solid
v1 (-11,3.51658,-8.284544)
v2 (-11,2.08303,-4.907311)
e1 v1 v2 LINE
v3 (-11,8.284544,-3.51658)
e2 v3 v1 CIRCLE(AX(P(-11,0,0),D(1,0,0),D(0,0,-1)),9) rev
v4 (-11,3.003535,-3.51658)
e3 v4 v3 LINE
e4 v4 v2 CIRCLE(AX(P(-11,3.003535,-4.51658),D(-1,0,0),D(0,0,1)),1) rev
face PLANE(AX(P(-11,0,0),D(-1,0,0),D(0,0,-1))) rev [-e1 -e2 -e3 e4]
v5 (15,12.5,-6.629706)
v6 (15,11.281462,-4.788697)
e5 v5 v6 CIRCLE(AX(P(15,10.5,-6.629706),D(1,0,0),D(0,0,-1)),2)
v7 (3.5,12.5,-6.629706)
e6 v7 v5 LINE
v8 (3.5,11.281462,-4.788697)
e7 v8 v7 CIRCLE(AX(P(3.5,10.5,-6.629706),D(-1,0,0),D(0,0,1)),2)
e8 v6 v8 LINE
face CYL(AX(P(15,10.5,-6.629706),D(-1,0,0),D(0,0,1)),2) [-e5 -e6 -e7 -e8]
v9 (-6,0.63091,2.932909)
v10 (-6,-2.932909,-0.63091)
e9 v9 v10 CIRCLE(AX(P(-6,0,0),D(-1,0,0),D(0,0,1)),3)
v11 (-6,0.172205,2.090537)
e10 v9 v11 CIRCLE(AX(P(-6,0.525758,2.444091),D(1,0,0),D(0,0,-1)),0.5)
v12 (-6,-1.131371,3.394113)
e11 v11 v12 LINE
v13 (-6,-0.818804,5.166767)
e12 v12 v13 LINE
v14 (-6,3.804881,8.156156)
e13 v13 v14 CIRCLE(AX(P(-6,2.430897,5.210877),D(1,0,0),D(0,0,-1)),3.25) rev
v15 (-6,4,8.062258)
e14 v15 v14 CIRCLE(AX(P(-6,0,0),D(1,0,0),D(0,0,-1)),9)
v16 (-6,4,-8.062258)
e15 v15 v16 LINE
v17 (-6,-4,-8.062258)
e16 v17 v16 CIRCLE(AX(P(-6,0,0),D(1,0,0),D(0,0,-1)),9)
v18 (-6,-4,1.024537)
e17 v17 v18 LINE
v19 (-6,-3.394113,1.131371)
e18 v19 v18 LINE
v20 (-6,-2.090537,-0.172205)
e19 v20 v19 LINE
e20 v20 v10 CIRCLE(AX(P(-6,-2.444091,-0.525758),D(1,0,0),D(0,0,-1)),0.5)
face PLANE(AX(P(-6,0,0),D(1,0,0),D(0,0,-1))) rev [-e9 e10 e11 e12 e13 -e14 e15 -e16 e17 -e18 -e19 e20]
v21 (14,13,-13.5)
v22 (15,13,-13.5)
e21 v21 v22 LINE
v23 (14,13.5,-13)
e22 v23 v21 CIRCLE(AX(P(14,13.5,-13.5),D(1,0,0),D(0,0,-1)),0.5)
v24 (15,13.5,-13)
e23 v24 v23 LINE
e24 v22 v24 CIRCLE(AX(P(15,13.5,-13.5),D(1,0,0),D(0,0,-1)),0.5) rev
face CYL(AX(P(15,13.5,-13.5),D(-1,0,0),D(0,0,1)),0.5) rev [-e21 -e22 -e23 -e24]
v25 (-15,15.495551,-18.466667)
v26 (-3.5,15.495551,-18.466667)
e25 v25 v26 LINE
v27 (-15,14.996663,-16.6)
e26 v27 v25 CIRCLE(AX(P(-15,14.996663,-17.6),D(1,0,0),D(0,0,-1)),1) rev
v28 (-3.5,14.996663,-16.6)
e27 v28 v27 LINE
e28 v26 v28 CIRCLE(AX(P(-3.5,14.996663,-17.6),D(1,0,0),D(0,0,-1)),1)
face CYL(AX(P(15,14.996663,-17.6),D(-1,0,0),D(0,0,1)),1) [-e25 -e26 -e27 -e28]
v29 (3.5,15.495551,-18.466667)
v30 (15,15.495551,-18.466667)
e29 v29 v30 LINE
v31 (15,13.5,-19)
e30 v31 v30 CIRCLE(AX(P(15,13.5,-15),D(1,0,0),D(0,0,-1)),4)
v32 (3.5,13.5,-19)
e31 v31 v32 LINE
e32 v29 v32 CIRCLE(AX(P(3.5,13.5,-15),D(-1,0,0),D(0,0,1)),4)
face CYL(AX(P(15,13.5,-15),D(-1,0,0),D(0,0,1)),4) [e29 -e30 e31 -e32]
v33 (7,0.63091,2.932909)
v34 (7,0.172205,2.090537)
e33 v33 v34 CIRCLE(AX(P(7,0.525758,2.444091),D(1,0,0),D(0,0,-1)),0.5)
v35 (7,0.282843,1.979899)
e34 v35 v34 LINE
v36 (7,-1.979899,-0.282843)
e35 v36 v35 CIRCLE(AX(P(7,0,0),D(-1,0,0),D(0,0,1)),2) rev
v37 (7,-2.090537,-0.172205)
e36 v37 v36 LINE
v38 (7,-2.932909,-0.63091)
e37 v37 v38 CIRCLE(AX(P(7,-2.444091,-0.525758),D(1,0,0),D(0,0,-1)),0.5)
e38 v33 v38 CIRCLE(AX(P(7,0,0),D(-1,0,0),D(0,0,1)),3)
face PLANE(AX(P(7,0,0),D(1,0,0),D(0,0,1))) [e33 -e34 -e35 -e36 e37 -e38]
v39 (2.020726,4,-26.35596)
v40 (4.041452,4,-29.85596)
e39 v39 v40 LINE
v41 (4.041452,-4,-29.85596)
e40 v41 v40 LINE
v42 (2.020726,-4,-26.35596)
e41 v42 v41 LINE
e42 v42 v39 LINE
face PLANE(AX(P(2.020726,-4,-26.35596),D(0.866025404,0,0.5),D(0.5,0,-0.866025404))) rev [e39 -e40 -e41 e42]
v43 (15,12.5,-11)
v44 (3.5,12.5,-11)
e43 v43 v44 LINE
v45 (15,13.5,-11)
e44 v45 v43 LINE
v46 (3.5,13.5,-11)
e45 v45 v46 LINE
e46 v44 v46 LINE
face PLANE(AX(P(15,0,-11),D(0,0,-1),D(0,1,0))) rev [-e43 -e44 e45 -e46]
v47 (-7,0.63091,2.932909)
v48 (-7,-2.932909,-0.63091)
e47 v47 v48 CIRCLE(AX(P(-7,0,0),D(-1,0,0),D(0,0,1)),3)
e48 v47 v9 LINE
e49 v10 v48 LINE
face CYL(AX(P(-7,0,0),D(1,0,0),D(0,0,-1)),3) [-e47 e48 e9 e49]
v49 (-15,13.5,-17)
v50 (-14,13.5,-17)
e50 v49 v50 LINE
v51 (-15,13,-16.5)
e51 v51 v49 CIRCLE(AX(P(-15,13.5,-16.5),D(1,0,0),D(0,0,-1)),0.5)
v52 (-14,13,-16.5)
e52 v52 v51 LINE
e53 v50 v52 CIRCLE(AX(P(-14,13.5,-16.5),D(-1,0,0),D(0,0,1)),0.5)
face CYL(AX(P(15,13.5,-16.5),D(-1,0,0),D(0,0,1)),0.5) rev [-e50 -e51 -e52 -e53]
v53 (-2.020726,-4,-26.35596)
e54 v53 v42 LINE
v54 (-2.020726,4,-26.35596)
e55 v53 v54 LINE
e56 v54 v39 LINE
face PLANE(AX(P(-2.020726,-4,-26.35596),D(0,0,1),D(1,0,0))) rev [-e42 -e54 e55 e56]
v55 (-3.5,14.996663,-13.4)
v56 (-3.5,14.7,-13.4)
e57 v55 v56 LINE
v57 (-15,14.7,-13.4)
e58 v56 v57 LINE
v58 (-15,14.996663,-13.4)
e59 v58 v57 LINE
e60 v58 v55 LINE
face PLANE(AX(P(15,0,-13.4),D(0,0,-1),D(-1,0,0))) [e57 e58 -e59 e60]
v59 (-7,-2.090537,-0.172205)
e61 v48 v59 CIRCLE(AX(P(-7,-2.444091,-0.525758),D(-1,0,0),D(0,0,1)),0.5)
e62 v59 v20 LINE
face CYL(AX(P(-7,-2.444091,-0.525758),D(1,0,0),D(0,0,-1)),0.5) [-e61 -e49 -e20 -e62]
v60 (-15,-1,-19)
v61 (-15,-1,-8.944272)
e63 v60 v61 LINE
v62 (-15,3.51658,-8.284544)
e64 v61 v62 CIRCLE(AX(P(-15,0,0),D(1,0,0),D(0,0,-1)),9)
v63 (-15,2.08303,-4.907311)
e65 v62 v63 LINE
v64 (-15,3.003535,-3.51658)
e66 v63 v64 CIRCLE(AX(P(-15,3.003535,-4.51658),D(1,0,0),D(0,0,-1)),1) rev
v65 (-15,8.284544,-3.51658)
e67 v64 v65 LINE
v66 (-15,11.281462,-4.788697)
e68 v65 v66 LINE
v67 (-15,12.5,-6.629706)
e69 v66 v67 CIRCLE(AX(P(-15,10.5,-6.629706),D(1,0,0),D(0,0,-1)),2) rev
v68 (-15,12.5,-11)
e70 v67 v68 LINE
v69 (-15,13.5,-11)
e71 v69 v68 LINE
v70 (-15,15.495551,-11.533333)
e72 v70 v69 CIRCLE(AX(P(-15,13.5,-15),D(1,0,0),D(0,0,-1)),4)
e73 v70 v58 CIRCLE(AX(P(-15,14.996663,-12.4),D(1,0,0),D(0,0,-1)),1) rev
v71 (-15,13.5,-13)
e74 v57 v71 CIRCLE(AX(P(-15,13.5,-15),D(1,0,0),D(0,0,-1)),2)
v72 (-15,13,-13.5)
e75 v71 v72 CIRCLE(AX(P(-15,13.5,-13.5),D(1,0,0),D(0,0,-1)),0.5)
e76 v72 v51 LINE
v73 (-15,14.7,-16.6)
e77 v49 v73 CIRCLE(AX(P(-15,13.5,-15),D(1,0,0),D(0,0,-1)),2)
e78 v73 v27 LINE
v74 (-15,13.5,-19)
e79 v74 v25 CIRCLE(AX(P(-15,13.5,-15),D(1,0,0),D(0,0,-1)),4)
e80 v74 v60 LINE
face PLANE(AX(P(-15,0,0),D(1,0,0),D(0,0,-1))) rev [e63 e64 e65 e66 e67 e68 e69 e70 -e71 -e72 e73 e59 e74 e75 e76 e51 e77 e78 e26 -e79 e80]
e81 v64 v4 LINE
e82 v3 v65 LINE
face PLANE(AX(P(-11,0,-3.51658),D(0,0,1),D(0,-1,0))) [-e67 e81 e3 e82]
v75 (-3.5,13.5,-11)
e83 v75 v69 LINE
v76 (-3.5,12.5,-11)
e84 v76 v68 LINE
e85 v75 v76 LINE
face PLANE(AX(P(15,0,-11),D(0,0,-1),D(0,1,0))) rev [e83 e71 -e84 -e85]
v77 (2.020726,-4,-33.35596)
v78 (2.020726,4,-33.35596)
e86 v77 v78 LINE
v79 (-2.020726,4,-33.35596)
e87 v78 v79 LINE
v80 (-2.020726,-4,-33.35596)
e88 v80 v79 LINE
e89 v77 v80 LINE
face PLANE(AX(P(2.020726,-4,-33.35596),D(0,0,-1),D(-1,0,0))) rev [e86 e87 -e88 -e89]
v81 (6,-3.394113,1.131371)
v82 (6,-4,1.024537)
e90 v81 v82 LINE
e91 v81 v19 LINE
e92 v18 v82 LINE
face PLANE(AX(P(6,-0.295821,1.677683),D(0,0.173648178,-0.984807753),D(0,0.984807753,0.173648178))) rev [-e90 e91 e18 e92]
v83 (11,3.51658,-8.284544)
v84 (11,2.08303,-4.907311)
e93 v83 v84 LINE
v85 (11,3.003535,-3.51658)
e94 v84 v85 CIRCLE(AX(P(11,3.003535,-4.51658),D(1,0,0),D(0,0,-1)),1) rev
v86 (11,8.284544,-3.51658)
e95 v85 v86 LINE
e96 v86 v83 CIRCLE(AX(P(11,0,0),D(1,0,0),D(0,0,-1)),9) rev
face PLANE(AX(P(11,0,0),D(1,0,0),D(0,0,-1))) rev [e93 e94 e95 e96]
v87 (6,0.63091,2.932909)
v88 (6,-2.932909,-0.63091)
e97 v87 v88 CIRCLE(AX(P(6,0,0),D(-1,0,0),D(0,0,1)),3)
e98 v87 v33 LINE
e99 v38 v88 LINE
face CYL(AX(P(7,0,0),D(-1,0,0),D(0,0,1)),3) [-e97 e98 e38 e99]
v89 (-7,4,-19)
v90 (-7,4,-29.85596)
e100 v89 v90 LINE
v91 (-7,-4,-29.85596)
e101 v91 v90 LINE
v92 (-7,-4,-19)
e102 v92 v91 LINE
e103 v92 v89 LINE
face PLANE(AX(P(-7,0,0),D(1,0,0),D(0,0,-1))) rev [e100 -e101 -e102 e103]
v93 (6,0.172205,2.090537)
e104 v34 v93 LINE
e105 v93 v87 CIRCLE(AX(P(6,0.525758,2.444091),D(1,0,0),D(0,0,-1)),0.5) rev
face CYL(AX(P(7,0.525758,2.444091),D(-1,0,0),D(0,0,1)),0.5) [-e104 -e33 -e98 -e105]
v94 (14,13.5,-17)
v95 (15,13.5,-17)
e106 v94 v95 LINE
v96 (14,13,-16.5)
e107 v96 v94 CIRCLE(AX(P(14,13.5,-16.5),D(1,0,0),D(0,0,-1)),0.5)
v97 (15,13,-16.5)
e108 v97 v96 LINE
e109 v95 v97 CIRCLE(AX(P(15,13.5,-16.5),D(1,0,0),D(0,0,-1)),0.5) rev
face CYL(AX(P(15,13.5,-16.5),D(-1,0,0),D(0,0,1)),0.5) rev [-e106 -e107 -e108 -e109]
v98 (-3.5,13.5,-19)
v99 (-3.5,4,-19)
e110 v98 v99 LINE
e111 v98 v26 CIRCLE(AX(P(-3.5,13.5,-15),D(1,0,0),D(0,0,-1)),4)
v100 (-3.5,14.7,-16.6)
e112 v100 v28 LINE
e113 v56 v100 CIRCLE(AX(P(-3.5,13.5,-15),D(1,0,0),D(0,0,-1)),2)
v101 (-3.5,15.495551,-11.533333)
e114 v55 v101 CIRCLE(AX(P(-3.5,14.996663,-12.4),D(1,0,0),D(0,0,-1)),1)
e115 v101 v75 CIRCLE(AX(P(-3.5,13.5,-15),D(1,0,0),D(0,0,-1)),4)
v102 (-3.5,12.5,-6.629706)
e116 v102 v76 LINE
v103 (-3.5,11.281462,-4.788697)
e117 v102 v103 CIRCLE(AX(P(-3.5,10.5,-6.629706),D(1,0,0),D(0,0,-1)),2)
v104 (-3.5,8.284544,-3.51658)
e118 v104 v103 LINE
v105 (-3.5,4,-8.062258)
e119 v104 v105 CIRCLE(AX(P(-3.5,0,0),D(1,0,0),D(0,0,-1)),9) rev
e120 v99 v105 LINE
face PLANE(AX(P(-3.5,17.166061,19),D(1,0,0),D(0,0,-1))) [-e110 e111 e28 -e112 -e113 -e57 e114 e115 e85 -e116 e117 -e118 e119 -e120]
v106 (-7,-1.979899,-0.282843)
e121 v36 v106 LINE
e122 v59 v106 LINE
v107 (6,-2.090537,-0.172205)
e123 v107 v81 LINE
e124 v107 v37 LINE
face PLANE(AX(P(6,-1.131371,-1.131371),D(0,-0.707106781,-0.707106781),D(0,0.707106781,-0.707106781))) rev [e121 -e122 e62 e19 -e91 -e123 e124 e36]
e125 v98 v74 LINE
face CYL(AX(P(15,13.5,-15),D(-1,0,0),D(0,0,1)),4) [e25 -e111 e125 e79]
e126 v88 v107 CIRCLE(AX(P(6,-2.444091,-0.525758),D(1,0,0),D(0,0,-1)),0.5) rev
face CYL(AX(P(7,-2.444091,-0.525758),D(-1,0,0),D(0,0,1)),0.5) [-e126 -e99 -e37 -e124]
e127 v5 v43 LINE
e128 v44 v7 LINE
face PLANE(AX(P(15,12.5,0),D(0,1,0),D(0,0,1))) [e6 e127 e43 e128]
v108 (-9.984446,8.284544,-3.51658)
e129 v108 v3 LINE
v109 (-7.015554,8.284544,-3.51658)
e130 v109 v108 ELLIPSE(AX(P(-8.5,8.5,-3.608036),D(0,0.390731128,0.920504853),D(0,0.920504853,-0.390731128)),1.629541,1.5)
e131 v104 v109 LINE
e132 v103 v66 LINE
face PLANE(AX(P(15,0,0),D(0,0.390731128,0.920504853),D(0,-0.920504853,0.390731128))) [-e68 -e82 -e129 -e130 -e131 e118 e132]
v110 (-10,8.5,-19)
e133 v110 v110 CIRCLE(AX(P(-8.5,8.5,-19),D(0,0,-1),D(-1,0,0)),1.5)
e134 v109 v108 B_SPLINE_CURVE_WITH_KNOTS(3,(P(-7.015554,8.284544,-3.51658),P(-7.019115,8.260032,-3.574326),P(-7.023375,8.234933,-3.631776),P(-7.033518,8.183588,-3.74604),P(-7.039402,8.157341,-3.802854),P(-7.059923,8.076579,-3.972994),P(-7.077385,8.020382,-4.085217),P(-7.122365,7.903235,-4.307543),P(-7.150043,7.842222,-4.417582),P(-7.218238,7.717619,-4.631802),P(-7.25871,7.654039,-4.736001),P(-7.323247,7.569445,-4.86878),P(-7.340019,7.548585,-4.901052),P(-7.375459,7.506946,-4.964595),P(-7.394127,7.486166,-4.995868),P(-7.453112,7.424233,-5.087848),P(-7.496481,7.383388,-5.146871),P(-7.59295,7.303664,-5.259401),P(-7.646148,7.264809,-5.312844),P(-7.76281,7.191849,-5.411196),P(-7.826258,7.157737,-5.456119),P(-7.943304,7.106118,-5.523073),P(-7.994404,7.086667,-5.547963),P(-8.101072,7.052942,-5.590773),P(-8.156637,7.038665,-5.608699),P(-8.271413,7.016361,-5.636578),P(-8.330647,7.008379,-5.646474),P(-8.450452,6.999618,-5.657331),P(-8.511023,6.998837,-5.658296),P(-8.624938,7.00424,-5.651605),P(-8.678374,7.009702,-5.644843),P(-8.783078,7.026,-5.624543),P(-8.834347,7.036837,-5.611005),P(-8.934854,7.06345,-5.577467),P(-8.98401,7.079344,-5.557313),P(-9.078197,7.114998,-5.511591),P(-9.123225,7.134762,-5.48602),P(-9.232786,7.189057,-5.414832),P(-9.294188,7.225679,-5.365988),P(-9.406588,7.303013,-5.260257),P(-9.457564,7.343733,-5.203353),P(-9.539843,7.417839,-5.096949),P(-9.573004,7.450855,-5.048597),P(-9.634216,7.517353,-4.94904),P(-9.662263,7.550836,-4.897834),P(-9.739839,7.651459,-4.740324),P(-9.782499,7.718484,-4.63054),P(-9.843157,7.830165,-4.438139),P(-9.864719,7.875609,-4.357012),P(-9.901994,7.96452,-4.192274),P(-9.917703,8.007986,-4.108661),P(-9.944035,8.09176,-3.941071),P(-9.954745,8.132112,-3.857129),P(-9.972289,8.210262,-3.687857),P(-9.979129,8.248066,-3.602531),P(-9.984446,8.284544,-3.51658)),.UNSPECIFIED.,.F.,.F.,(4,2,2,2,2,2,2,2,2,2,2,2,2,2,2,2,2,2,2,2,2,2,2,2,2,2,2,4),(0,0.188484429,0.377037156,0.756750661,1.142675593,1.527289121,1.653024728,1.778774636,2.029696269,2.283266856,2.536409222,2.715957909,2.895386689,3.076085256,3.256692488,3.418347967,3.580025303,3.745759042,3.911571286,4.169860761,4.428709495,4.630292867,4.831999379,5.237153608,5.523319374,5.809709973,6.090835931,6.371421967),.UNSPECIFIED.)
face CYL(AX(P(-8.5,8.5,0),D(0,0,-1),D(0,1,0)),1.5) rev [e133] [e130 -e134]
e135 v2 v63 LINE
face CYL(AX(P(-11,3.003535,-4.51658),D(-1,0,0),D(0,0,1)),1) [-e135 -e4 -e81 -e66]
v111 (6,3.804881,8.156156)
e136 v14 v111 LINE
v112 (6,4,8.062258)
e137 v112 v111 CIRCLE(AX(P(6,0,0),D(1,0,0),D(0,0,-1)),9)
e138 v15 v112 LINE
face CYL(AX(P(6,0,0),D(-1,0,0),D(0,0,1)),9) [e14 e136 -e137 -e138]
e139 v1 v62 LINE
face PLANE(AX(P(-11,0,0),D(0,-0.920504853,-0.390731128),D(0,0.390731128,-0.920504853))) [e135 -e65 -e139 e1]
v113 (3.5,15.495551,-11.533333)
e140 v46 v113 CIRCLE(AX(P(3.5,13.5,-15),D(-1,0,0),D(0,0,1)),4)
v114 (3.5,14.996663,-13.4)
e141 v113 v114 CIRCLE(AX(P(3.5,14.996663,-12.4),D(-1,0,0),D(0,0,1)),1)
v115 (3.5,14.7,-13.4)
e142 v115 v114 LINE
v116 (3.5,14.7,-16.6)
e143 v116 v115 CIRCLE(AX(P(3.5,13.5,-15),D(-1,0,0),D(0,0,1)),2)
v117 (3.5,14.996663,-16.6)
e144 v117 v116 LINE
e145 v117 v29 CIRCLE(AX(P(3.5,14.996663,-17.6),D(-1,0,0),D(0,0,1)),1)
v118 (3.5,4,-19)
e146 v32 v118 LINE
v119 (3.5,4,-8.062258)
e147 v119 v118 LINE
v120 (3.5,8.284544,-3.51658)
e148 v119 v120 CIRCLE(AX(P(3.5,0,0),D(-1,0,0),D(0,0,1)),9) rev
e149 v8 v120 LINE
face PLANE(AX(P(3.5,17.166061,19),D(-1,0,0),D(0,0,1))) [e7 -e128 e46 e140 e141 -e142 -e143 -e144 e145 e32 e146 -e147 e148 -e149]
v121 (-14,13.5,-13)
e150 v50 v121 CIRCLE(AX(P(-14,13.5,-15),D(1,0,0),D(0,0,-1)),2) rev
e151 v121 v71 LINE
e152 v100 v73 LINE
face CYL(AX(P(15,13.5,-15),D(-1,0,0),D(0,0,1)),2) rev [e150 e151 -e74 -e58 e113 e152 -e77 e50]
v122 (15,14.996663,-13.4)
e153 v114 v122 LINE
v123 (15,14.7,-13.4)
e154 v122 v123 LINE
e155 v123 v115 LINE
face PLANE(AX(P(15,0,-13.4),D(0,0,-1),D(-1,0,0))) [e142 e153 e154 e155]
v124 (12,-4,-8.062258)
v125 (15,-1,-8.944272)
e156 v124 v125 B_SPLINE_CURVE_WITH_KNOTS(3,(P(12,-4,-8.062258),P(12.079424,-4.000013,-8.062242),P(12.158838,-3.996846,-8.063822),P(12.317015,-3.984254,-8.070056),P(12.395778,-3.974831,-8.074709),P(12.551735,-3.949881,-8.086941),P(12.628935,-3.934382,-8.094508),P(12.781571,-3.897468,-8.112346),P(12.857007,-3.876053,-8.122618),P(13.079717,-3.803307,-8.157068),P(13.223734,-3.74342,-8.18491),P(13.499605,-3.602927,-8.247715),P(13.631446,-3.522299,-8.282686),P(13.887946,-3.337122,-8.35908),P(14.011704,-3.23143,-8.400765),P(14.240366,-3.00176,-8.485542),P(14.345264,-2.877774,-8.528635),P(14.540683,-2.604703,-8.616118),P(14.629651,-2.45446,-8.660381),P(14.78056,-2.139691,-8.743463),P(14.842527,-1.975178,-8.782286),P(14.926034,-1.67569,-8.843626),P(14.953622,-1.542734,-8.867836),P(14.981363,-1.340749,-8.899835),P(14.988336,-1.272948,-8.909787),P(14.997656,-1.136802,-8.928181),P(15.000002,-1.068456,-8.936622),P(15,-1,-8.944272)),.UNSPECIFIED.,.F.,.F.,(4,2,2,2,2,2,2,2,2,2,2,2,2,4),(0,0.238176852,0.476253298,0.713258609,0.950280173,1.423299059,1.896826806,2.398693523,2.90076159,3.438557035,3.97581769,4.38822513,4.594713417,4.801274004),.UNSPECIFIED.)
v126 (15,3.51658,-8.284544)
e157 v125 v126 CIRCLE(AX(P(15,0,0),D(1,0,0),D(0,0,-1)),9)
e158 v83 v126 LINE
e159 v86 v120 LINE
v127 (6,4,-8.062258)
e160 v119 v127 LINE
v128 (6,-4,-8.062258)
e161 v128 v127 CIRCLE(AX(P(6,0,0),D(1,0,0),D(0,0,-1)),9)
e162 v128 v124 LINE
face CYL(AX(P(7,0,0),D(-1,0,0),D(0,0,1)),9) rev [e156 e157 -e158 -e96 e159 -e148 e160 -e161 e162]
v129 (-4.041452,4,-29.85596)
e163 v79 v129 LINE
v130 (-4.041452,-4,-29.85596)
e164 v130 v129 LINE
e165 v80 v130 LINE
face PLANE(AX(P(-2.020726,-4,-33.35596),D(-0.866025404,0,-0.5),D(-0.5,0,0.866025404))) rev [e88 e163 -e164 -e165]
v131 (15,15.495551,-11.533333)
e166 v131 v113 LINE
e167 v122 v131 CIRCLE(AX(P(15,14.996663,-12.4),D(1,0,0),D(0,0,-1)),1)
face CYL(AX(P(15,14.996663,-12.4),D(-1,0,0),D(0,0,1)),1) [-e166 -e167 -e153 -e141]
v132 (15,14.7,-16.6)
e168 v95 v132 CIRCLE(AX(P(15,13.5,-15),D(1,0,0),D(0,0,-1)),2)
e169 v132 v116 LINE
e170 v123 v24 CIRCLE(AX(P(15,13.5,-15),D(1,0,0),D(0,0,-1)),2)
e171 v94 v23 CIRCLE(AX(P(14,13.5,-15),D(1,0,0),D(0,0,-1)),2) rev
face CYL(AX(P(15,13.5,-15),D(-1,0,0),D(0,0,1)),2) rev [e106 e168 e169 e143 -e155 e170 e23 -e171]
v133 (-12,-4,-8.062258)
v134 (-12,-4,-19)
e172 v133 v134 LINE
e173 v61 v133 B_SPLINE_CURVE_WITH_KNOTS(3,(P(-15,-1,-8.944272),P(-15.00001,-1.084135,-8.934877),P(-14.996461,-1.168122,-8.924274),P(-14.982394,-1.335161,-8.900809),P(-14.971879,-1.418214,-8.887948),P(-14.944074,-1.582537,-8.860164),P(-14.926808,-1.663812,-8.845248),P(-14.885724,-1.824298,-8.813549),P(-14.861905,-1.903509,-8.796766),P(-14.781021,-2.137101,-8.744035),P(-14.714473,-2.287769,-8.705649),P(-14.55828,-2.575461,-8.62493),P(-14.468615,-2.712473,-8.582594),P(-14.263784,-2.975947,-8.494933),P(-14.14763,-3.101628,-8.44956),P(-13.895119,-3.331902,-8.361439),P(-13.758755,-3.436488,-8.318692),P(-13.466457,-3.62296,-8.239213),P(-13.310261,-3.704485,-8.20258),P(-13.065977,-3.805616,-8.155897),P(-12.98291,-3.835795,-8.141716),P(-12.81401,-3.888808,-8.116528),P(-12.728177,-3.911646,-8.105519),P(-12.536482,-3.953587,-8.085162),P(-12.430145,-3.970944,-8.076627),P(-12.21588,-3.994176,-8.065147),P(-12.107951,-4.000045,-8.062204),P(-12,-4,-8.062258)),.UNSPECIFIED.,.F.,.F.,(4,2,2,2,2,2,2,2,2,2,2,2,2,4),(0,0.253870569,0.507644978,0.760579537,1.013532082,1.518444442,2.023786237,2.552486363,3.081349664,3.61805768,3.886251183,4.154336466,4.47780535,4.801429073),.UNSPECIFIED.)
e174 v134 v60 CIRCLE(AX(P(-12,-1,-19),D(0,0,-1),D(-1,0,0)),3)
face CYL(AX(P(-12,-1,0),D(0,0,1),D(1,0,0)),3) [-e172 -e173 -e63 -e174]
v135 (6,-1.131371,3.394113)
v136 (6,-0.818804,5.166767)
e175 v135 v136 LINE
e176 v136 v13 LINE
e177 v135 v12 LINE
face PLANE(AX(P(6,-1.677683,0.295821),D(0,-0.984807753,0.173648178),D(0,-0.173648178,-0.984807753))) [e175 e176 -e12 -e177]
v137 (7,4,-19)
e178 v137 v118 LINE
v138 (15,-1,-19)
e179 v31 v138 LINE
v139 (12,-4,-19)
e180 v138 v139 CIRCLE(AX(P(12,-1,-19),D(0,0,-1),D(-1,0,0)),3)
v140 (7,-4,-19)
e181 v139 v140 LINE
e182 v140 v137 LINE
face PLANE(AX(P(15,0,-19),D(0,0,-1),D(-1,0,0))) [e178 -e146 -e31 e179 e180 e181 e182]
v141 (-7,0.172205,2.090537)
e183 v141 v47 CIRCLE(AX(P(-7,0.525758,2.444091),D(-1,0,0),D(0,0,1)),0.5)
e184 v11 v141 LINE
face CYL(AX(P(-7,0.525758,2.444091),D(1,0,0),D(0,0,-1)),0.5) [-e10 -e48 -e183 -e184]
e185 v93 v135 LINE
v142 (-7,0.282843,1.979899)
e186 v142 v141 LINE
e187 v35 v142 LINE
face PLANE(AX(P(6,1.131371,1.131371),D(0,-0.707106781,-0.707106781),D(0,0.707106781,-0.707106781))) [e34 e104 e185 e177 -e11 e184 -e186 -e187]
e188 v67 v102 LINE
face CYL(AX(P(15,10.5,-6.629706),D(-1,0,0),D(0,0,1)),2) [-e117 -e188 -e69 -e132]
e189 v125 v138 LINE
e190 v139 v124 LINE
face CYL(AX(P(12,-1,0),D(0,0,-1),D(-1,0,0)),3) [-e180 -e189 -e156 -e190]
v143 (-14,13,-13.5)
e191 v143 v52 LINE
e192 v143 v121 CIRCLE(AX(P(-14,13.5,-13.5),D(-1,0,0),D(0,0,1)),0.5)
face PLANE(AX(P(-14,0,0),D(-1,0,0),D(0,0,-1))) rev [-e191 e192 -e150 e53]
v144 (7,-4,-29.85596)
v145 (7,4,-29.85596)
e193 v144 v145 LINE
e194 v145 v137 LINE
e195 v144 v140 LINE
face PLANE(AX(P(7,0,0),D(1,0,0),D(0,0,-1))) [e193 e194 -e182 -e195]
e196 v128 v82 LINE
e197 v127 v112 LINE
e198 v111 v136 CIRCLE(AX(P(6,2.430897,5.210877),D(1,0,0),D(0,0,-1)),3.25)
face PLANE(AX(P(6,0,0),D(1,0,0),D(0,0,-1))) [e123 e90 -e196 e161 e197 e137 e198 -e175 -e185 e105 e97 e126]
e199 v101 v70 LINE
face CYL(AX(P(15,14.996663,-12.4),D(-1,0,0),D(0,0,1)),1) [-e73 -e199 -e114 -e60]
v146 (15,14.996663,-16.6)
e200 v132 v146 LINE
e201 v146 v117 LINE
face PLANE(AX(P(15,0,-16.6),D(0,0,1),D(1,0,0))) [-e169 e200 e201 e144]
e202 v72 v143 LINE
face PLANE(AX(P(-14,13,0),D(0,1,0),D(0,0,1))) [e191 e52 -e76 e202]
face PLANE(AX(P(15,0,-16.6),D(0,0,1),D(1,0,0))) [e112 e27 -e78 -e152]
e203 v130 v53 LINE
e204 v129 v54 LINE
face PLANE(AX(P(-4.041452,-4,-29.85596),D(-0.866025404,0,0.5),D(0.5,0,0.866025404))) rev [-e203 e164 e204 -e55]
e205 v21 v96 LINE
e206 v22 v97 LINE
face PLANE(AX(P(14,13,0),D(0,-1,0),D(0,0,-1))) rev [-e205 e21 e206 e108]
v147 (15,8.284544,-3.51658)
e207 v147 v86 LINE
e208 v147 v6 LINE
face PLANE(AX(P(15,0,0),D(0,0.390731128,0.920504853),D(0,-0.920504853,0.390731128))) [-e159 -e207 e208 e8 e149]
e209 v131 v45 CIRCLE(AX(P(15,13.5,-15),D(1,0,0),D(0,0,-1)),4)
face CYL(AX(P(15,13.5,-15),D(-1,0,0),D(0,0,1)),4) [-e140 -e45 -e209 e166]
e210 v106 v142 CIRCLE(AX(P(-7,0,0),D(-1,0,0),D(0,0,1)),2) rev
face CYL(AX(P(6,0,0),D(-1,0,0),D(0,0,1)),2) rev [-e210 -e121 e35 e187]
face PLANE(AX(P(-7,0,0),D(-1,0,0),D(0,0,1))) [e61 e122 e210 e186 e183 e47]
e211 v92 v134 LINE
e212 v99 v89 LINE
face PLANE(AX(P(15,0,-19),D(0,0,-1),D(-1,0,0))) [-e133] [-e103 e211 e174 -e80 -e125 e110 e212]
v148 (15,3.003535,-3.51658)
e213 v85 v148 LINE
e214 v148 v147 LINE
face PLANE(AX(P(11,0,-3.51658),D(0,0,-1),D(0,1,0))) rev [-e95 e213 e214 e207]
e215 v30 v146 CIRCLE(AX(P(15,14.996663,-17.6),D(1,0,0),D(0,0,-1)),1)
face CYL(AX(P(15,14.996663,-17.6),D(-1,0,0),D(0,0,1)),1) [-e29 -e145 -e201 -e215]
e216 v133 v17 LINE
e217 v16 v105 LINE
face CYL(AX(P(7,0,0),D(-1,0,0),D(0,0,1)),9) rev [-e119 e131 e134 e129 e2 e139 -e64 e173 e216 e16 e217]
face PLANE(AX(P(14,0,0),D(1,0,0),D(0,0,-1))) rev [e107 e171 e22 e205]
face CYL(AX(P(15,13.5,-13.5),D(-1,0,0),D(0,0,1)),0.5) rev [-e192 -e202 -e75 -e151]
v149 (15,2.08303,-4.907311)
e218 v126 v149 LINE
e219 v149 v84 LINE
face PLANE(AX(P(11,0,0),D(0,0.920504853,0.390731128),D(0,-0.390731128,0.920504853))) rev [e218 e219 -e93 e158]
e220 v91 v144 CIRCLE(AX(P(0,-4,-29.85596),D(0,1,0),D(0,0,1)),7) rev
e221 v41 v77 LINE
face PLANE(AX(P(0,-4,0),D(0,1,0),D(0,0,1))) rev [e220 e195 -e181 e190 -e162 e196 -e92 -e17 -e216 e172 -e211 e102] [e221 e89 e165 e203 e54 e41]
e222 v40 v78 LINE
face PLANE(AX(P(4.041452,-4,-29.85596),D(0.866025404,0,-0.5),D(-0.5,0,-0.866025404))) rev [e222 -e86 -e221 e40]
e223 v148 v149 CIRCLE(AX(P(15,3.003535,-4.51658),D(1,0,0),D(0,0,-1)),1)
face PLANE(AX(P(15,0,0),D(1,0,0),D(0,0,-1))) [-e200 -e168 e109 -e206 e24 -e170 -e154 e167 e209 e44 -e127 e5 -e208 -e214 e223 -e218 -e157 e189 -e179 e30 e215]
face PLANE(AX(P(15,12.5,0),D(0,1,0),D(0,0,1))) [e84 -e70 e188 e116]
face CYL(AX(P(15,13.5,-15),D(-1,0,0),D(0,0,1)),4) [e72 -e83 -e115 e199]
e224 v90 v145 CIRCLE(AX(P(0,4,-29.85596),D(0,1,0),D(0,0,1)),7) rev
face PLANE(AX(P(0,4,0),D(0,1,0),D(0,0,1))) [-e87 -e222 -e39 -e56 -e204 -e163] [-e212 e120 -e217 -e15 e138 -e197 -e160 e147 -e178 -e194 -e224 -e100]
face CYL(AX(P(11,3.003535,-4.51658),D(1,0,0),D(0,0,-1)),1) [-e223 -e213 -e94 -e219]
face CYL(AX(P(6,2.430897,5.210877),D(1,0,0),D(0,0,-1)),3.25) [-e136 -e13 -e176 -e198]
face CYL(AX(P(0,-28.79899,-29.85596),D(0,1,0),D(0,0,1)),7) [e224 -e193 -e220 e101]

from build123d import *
from build123d.topology import SkipClean

# Parameters (mm, degrees)
BOSS_EXTRUDE1_DEPTH      = 6
BOSS_EXTRUDE2_DEPTH      = 7
SKETCH6_R                = 7
BOSS_EXTRUDE3_DEPTH      = 18
BOSS_EXTRUDE4_DEPTH      = 8
BOSS_EXTRUDE4_DEPTH_BACK = 8
SKETCH7_R                = 4.5
CUT_EXTRUDE2_DEPTH       = 5
CUT_EXTRUDE4_START       = -5
CUT_EXTRUDE4_DEPTH       = 5
BOSS_EXTRUDE6_DEPTH      = 1
FILLET3_R                = 0.5
FILLET3_OF_MIRROR1_R     = 0.5
BOSS_EXTRUDE5_DEPTH      = 15
SKETCH20_W               = 7
SKETCH20_H               = 38
CUT_EXTRUDE7_DEPTH       = 42.913087917
FILLET1_START            = -6
FILLET1_DEPTH            = 12
FILLET2_R                = 1
CUT_EXTRUDE8_DEPTH       = 42.560578801
BOSS_EXTRUDE7_DEPTH      = 1
FILLET4_R                = 0.5
FILLET4_OF_MIRROR2_R     = 0.5
FILLET5_R                = 3
FILLET7_R                = 2
CUT_SWEEP1_PROFILE_R     = 1.5
BOSS_EXTRUDE8_DEPTH      = 4
FILLET8_R                = 1
FILLET8_OF_MIRROR3_R     = 1


with BuildPart() as part:
    # Sketch3 → Boss-Extrude1 (new, symmetric)
    with BuildSketch(Plane(origin=(0, 0, 0), x_dir=(0, 0, -1), z_dir=(1, 0, 0))):
        with BuildLine():
            ThreePointArc((2, 0), (1.51090791, -1.310403483), (0.282842712, -1.979898987))
            Line((0.282842712, -1.979898987), (-1.13137085, -3.39411255))
            Line((-1.13137085, -3.39411255), (-0.81880413, -5.166766505))
            Line((-0.81880413, -5.166766505), (-3.807139593, -8.155101968))
            ThreePointArc((-3.807139593, -8.155101968), (4.834032667, -7.591582718), (9, 0))
            ThreePointArc((9, 0), (-1.949882341, 8.7862369), (-8.155101968, -3.807139593))
            Line((-8.155101968, -3.807139593), (-5.166766505, -0.81880413))
            Line((-5.166766505, -0.81880413), (-3.39411255, -1.13137085))
            Line((-3.39411255, -1.13137085), (-1.979898987, 0.282842712))
            ThreePointArc((-1.979898987, 0.282842712), (0.14177804, 1.994968418), (2, 0))
        make_face()
    extrude(amount=BOSS_EXTRUDE1_DEPTH, both=True)

    # Sketch5 → Boss-Extrude2 (add, symmetric)
    with BuildSketch(Plane(origin=(0, 0, 0), x_dir=(0, 0, -1), z_dir=(1, 0, 0))):
        with BuildLine():
            Line((0, 9), (29.855960009, 9))
            Line((29.855960009, 9), (29.855960009, -9))
            Line((29.855960009, -9), (0, -9))
            ThreePointArc((0, -9), (9, 0), (0, 9))
        make_face()
    extrude(amount=BOSS_EXTRUDE2_DEPTH, both=True)

    # Sketch6 → Boss-Extrude3 (add)
    with BuildSketch(Plane(origin=(0, 9, 0), x_dir=(1, 0, 0), z_dir=(0, 1, 0))):
        with Locations((0, 29.855960009)):
            Circle(SKETCH6_R)
    extrude(amount=-BOSS_EXTRUDE3_DEPTH)

    # Sketch7 → Boss-Extrude4 (add, two sides: drawn at the far end of the back side and taken through both)
    with BuildSketch(Plane(origin=(0, 0, 0), x_dir=(1, 0, 0), z_dir=(0, 1, 0)).offset(-BOSS_EXTRUDE4_DEPTH_BACK)):
        with Locations((0, 29.855960009)):
            Circle(SKETCH7_R)
    extrude(amount=BOSS_EXTRUDE4_DEPTH + BOSS_EXTRUDE4_DEPTH_BACK)

    # Sketch8 → Cut-Extrude2 (cut)
    with BuildSketch(Plane(origin=(0, 9, 0), x_dir=(1, 0, 0), z_dir=(0, 1, 0))):
        with BuildLine():
            Line((6, -9), (6, 0))
            Line((6, 0), (7, 0))
            Line((7, 0), (7, 29.855960009))
            ThreePointArc((7, 29.855960009), (0, 36.855960009), (-7, 29.855960009))
            Line((-7, 29.855960009), (-7, 0))
            Line((-7, 0), (-6, 0))
            Line((-6, 0), (-6, -9))
            Line((-6, -9), (6, -9))
        make_face()
    extrude(amount=-CUT_EXTRUDE2_DEPTH, mode=Mode.SUBTRACT)

    # Sketch9 → Cut-Extrude4 (cut)
    with BuildSketch(Plane.XZ.offset(9).offset(CUT_EXTRUDE4_START)):
        with BuildLine():
            Line((6, 0), (6, 9))
            Line((6, 9), (-6, 9))
            Line((-6, 9), (-6, 0))
            Line((-6, 0), (-7, 0))
            Line((-7, 0), (-7, -29.855960009))
            ThreePointArc((-7, -29.855960009), (0, -36.855960009), (7, -29.855960009))
            Line((7, -29.855960009), (7, 0))
            Line((7, 0), (6, 0))
        make_face()
    extrude(amount=CUT_EXTRUDE4_DEPTH, mode=Mode.SUBTRACT)

    # Sketch24 → Boss-Extrude6 (add)
    with SkipClean():  # the faces are left unmerged after this step: merging them gives an invalid solid
        with BuildSketch(Plane.ZY.offset(6)):
            with BuildLine():
                ThreePointArc((-0.282842712, -1.979898987), (-1.414213562, 1.414213562), (1.979898987, 0.282842712))
                Line((1.979898987, 0.282842712), (2.925806694, -0.663064995))
                ThreePointArc((2.925806694, -0.663064995), (2.981393976, -0.333601496), (3, 0))
                ThreePointArc((3, 0), (-2.344055778, 1.872272018), (0.663064995, -2.925806694))
                Line((0.663064995, -2.925806694), (-0.282842712, -1.979898987))
            make_face()
        boss_extrude6 = extrude(amount=BOSS_EXTRUDE6_DEPTH)

    # Fillet3
    # the kernel refuses this fillet: 0.5 mm, written as the material it takes off along each edge
    with BuildSketch(Plane(origin=(-6, -0.663064995, 2.925806694), x_dir=(0, 0.9999849386062066, 0.005488402385122609), z_dir=(-1, 0, 0))) as fillet3_piece_1:
        with BuildLine():
            CenterArc((1.186161173, 0.488233633), FILLET3_R, 135.314463872, 147.140119621)
            Line((0.830672664, 0.839841255), (0, 0))
            ThreePointArc((0, 0), (0.646997003, -0.070598205), (1.293994007, 0))
        make_face()
    extrude(amount=4.234985017, mode=Mode.SUBTRACT)
    with BuildSketch(Plane(origin=(-6, -2.925806694, 0.663064995), x_dir=(0, -0.005488402385198552, -0.9999849386062063), z_dir=(-1, 0, 0))) as fillet3_piece_2:
        with BuildLine():
            CenterArc((1.186161173, -0.488233633), FILLET3_R, 77.545416507, 147.140119621)
            Line((0.830672664, -0.839841255), (0, 0))
            ThreePointArc((0, 0), (0.646997003, 0.070598205), (1.293994007, 0))
        make_face()
    extrude(amount=4.234985017, mode=Mode.SUBTRACT)

    # Mirror1: Boss-Extrude6 across plane
    add(boss_extrude6.mirror(Plane(origin=(0, 0, 0), x_dir=(0, 0, 1), z_dir=(1, 0, 0))))

    # Fillet3 of Mirror1
    # the kernel refuses this fillet: 0.5 mm, written as the material it takes off along each edge
    with BuildSketch(Plane(origin=(6, -0.663064995, 2.925806694), x_dir=(0, 0.7071067811865444, -0.7071067811865507), z_dir=(1, 0, 0))) as fillet3_of_mirror1_piece_1:
        with BuildLine():
            CenterArc((1.181249511, 0.5), FILLET3_OF_MIRROR1_R, 122.859880379, 147.140119621)
            ThreePointArc((0.909956312, 0.92), (0.404784455, 0.509645734), (0, 0))
            Line((0, 0), (1.181249511, 0))
        make_face()
    extrude(amount=4.234985017, mode=Mode.SUBTRACT)
    with BuildSketch(Plane(origin=(6, -2.925806694, 0.663064995), x_dir=(0, 0.7071067811865442, -0.7071067811865509), z_dir=(1, 0, 0))) as fillet3_of_mirror1_piece_2:
        with BuildLine():
            CenterArc((1.181249511, -0.5), FILLET3_OF_MIRROR1_R, 90, 147.140119621)
            ThreePointArc((0.909956312, -0.92), (0.404784455, -0.509645734), (0, 0))
            Line((0, 0), (1.181249511, 0))
        make_face()
    extrude(amount=4.234985017, mode=Mode.SUBTRACT)

    # Sketch10 → Boss-Extrude5 (add, symmetric)
    with BuildSketch(Plane(origin=(0, 0, 0), x_dir=(0, 0, -1), z_dir=(1, 0, 0))):
        with BuildLine():
            ThreePointArc((8.062257748, -4), (9, 0), (8.062257748, 4))
            Line((8.062257748, 4), (19, 4))
            Line((19, 4), (19, -4))
            Line((19, -4), (8.062257748, -4))
        make_face()
        with BuildLine():
            Line((13.4, 17.166060556), (13.4, 14.7))
            ThreePointArc((13.4, 14.7), (15, 11.5), (16.6, 14.7))
            Line((16.6, 14.7), (16.6, 17.166060556))
            ThreePointArc((16.6, 17.166060556), (18.346640106, 15.69089023), (19, 13.5))
            Line((19, 13.5), (19, 4))
            Line((19, 4), (8.062257748, 4))
            ThreePointArc((8.062257748, 4), (6.173062485, 6.549297638), (3.516580156, 8.284543681))
            Line((3.516580156, 8.284543681), (5.305935203, 12.5))
            Line((5.305935203, 12.5), (11, 12.5))
            Line((11, 12.5), (11, 13.5))
            ThreePointArc((11, 13.5), (11.653359894, 15.69089023), (13.4, 17.166060556))
        make_face()
    extrude(amount=BOSS_EXTRUDE5_DEPTH, both=True)

    # Sketch20 → Cut-Extrude7 (cut, through all)
    with BuildSketch(Plane(origin=(0, 4, 0), x_dir=(1, 0, 0), z_dir=(0, 1, 0))):
        Rectangle(SKETCH20_W, SKETCH20_H)
    extrude(amount=CUT_EXTRUDE7_DEPTH, mode=Mode.SUBTRACT)

    # Fillet1: read off the stored shape, not the designer's step
    # Fillet1 outline → Fillet1 (cut)
    with BuildSketch(Plane.YZ.offset(FILLET1_START)):
        with BuildLine():
            ThreePointArc((-0.81880413, 5.166766505), (0.666331593, 7.940128227), (3.804881491, 8.156155764))
            ThreePointArc((3.804881491, 8.156155764), (-0.001245944, 8.999999913), (-3.807139593, 8.155101968))
            Line((-3.807139593, 8.155101968), (-0.81880413, 5.166766505))
        make_face()
    extrude(amount=FILLET1_DEPTH, mode=Mode.SUBTRACT)

    # Fillet2
    fillet2_edges = [part.edges().sort_by_distance(p)[0] for p in [
        (9.25, 17.166060556, -16.6),
        (9.25, 17.166060556, -13.4),
        (-9.25, 17.166060556, -13.4),
        (-9.25, 17.166060556, -16.6),
    ]]
    fillet(fillet2_edges, radius=FILLET2_R)

    # Sketch23 → Cut-Extrude8 (cut, through all)
    with BuildSketch(Plane(origin=(0, 4, 0), x_dir=(1, 0, 0), z_dir=(0, 1, 0))):
        Polygon((4.041451884, 29.855960009), (2.020725942, 33.355960009), (-2.020725942, 33.355960009), (-4.041451884, 29.855960009), (-2.020725942, 26.355960009), (2.020725942, 26.355960009), align=None)
    extrude(amount=-CUT_EXTRUDE8_DEPTH, mode=Mode.SUBTRACT)

    # Sketch25 → Boss-Extrude7 (add)
    with BuildSketch(Plane(origin=(15, 0, 0), x_dir=(0, 0, -1), z_dir=(1, 0, 0))):
        with BuildLine():
            Line((16.936491673, 13), (13.063508327, 13))
            ThreePointArc((13.063508327, 13), (15, 11.5), (16.936491673, 13))
        make_face()
    boss_extrude7 = extrude(amount=-BOSS_EXTRUDE7_DEPTH)

    # Fillet4
    fillet4_edges = [part.edges().sort_by_distance(p)[0] for p in [
        (14.5, 13, -13.063508327),
        (14.5, 13, -16.936491673),
    ]]
    fillet(fillet4_edges, radius=FILLET4_R)

    # Mirror2: Boss-Extrude7 across plane
    add(boss_extrude7.mirror(Plane(origin=(0, 0, 0), x_dir=(0, 0, 1), z_dir=(1, 0, 0))))

    # Fillet4 of Mirror2
    fillet4_of_mirror2_edges = [part.edges().sort_by_distance(p)[0] for p in [
        (-14.5, 13, -13.063508327),
        (-14.5, 13, -16.936491673),
    ]]
    fillet(fillet4_of_mirror2_edges, radius=FILLET4_OF_MIRROR2_R)

    # Fillet5
    fillet5_edges = [part.edges().sort_by_distance(p)[0] for p in [
        (15, -4, -13.531128874),
        (-15, -4, -13.531128874),
    ]]
    fillet(fillet5_edges, radius=FILLET5_R)

    # Fillet7
    fillet7_edges = [part.edges().sort_by_distance(p)[0] for p in [
        (9.25, 12.5, -5.305935203),
        (-9.25, 12.5, -5.305935203),
    ]]
    fillet(fillet7_edges, radius=FILLET7_R)

    # Cut-Sweep1: sweep along a path in Sketch27
    with BuildLine(Plane.ZY.offset(8.5)) as cut_sweep1_path:
        Line((0, 8.5), (-25.421416279, 8.5))
    # Cut-Sweep1 profile (on start of the path) → Cut-Sweep1 (sweep, cut)
    with BuildSketch(Plane(origin=(-8.5, 8.5, 0), x_dir=(0, -1, 0), z_dir=(0, 0, -1))):
        Circle(CUT_SWEEP1_PROFILE_R)
    sweep(path=cut_sweep1_path.line, mode=Mode.SUBTRACT)

    # Sketch28 → Boss-Extrude8 (add)
    with BuildSketch(Plane(origin=(15, 0, 0), x_dir=(0, 0, -1), z_dir=(1, 0, 0))):
        with BuildLine():
            Line((3.516580156, 1.492699716), (8.284543681, 3.516580156))
            ThreePointArc((8.284543681, 3.516580156), (6.363961031, 6.363961031), (3.516580156, 8.284543681))
            Line((3.516580156, 8.284543681), (3.516580156, 1.492699716))
        make_face()
    boss_extrude8 = extrude(amount=-BOSS_EXTRUDE8_DEPTH)

    # Fillet8
    fillet8_edges = [part.edges().sort_by_distance(p)[0] for p in [
        (13, 1.492699716, -3.516580156),
    ]]
    fillet(fillet8_edges, radius=FILLET8_R)

    # Mirror3: Boss-Extrude8 across plane
    add(boss_extrude8.mirror(Plane(origin=(0, 0, 0), x_dir=(0, 0, 1), z_dir=(1, 0, 0))))

    # Fillet8 of Mirror3
    fillet8_of_mirror3_edges = [part.edges().sort_by_distance(p)[0] for p in [
        (-13, 1.492699716, -3.516580156),
    ]]
    fillet(fillet8_of_mirror3_edges, radius=FILLET8_OF_MIRROR3_R)


solid = part.part
